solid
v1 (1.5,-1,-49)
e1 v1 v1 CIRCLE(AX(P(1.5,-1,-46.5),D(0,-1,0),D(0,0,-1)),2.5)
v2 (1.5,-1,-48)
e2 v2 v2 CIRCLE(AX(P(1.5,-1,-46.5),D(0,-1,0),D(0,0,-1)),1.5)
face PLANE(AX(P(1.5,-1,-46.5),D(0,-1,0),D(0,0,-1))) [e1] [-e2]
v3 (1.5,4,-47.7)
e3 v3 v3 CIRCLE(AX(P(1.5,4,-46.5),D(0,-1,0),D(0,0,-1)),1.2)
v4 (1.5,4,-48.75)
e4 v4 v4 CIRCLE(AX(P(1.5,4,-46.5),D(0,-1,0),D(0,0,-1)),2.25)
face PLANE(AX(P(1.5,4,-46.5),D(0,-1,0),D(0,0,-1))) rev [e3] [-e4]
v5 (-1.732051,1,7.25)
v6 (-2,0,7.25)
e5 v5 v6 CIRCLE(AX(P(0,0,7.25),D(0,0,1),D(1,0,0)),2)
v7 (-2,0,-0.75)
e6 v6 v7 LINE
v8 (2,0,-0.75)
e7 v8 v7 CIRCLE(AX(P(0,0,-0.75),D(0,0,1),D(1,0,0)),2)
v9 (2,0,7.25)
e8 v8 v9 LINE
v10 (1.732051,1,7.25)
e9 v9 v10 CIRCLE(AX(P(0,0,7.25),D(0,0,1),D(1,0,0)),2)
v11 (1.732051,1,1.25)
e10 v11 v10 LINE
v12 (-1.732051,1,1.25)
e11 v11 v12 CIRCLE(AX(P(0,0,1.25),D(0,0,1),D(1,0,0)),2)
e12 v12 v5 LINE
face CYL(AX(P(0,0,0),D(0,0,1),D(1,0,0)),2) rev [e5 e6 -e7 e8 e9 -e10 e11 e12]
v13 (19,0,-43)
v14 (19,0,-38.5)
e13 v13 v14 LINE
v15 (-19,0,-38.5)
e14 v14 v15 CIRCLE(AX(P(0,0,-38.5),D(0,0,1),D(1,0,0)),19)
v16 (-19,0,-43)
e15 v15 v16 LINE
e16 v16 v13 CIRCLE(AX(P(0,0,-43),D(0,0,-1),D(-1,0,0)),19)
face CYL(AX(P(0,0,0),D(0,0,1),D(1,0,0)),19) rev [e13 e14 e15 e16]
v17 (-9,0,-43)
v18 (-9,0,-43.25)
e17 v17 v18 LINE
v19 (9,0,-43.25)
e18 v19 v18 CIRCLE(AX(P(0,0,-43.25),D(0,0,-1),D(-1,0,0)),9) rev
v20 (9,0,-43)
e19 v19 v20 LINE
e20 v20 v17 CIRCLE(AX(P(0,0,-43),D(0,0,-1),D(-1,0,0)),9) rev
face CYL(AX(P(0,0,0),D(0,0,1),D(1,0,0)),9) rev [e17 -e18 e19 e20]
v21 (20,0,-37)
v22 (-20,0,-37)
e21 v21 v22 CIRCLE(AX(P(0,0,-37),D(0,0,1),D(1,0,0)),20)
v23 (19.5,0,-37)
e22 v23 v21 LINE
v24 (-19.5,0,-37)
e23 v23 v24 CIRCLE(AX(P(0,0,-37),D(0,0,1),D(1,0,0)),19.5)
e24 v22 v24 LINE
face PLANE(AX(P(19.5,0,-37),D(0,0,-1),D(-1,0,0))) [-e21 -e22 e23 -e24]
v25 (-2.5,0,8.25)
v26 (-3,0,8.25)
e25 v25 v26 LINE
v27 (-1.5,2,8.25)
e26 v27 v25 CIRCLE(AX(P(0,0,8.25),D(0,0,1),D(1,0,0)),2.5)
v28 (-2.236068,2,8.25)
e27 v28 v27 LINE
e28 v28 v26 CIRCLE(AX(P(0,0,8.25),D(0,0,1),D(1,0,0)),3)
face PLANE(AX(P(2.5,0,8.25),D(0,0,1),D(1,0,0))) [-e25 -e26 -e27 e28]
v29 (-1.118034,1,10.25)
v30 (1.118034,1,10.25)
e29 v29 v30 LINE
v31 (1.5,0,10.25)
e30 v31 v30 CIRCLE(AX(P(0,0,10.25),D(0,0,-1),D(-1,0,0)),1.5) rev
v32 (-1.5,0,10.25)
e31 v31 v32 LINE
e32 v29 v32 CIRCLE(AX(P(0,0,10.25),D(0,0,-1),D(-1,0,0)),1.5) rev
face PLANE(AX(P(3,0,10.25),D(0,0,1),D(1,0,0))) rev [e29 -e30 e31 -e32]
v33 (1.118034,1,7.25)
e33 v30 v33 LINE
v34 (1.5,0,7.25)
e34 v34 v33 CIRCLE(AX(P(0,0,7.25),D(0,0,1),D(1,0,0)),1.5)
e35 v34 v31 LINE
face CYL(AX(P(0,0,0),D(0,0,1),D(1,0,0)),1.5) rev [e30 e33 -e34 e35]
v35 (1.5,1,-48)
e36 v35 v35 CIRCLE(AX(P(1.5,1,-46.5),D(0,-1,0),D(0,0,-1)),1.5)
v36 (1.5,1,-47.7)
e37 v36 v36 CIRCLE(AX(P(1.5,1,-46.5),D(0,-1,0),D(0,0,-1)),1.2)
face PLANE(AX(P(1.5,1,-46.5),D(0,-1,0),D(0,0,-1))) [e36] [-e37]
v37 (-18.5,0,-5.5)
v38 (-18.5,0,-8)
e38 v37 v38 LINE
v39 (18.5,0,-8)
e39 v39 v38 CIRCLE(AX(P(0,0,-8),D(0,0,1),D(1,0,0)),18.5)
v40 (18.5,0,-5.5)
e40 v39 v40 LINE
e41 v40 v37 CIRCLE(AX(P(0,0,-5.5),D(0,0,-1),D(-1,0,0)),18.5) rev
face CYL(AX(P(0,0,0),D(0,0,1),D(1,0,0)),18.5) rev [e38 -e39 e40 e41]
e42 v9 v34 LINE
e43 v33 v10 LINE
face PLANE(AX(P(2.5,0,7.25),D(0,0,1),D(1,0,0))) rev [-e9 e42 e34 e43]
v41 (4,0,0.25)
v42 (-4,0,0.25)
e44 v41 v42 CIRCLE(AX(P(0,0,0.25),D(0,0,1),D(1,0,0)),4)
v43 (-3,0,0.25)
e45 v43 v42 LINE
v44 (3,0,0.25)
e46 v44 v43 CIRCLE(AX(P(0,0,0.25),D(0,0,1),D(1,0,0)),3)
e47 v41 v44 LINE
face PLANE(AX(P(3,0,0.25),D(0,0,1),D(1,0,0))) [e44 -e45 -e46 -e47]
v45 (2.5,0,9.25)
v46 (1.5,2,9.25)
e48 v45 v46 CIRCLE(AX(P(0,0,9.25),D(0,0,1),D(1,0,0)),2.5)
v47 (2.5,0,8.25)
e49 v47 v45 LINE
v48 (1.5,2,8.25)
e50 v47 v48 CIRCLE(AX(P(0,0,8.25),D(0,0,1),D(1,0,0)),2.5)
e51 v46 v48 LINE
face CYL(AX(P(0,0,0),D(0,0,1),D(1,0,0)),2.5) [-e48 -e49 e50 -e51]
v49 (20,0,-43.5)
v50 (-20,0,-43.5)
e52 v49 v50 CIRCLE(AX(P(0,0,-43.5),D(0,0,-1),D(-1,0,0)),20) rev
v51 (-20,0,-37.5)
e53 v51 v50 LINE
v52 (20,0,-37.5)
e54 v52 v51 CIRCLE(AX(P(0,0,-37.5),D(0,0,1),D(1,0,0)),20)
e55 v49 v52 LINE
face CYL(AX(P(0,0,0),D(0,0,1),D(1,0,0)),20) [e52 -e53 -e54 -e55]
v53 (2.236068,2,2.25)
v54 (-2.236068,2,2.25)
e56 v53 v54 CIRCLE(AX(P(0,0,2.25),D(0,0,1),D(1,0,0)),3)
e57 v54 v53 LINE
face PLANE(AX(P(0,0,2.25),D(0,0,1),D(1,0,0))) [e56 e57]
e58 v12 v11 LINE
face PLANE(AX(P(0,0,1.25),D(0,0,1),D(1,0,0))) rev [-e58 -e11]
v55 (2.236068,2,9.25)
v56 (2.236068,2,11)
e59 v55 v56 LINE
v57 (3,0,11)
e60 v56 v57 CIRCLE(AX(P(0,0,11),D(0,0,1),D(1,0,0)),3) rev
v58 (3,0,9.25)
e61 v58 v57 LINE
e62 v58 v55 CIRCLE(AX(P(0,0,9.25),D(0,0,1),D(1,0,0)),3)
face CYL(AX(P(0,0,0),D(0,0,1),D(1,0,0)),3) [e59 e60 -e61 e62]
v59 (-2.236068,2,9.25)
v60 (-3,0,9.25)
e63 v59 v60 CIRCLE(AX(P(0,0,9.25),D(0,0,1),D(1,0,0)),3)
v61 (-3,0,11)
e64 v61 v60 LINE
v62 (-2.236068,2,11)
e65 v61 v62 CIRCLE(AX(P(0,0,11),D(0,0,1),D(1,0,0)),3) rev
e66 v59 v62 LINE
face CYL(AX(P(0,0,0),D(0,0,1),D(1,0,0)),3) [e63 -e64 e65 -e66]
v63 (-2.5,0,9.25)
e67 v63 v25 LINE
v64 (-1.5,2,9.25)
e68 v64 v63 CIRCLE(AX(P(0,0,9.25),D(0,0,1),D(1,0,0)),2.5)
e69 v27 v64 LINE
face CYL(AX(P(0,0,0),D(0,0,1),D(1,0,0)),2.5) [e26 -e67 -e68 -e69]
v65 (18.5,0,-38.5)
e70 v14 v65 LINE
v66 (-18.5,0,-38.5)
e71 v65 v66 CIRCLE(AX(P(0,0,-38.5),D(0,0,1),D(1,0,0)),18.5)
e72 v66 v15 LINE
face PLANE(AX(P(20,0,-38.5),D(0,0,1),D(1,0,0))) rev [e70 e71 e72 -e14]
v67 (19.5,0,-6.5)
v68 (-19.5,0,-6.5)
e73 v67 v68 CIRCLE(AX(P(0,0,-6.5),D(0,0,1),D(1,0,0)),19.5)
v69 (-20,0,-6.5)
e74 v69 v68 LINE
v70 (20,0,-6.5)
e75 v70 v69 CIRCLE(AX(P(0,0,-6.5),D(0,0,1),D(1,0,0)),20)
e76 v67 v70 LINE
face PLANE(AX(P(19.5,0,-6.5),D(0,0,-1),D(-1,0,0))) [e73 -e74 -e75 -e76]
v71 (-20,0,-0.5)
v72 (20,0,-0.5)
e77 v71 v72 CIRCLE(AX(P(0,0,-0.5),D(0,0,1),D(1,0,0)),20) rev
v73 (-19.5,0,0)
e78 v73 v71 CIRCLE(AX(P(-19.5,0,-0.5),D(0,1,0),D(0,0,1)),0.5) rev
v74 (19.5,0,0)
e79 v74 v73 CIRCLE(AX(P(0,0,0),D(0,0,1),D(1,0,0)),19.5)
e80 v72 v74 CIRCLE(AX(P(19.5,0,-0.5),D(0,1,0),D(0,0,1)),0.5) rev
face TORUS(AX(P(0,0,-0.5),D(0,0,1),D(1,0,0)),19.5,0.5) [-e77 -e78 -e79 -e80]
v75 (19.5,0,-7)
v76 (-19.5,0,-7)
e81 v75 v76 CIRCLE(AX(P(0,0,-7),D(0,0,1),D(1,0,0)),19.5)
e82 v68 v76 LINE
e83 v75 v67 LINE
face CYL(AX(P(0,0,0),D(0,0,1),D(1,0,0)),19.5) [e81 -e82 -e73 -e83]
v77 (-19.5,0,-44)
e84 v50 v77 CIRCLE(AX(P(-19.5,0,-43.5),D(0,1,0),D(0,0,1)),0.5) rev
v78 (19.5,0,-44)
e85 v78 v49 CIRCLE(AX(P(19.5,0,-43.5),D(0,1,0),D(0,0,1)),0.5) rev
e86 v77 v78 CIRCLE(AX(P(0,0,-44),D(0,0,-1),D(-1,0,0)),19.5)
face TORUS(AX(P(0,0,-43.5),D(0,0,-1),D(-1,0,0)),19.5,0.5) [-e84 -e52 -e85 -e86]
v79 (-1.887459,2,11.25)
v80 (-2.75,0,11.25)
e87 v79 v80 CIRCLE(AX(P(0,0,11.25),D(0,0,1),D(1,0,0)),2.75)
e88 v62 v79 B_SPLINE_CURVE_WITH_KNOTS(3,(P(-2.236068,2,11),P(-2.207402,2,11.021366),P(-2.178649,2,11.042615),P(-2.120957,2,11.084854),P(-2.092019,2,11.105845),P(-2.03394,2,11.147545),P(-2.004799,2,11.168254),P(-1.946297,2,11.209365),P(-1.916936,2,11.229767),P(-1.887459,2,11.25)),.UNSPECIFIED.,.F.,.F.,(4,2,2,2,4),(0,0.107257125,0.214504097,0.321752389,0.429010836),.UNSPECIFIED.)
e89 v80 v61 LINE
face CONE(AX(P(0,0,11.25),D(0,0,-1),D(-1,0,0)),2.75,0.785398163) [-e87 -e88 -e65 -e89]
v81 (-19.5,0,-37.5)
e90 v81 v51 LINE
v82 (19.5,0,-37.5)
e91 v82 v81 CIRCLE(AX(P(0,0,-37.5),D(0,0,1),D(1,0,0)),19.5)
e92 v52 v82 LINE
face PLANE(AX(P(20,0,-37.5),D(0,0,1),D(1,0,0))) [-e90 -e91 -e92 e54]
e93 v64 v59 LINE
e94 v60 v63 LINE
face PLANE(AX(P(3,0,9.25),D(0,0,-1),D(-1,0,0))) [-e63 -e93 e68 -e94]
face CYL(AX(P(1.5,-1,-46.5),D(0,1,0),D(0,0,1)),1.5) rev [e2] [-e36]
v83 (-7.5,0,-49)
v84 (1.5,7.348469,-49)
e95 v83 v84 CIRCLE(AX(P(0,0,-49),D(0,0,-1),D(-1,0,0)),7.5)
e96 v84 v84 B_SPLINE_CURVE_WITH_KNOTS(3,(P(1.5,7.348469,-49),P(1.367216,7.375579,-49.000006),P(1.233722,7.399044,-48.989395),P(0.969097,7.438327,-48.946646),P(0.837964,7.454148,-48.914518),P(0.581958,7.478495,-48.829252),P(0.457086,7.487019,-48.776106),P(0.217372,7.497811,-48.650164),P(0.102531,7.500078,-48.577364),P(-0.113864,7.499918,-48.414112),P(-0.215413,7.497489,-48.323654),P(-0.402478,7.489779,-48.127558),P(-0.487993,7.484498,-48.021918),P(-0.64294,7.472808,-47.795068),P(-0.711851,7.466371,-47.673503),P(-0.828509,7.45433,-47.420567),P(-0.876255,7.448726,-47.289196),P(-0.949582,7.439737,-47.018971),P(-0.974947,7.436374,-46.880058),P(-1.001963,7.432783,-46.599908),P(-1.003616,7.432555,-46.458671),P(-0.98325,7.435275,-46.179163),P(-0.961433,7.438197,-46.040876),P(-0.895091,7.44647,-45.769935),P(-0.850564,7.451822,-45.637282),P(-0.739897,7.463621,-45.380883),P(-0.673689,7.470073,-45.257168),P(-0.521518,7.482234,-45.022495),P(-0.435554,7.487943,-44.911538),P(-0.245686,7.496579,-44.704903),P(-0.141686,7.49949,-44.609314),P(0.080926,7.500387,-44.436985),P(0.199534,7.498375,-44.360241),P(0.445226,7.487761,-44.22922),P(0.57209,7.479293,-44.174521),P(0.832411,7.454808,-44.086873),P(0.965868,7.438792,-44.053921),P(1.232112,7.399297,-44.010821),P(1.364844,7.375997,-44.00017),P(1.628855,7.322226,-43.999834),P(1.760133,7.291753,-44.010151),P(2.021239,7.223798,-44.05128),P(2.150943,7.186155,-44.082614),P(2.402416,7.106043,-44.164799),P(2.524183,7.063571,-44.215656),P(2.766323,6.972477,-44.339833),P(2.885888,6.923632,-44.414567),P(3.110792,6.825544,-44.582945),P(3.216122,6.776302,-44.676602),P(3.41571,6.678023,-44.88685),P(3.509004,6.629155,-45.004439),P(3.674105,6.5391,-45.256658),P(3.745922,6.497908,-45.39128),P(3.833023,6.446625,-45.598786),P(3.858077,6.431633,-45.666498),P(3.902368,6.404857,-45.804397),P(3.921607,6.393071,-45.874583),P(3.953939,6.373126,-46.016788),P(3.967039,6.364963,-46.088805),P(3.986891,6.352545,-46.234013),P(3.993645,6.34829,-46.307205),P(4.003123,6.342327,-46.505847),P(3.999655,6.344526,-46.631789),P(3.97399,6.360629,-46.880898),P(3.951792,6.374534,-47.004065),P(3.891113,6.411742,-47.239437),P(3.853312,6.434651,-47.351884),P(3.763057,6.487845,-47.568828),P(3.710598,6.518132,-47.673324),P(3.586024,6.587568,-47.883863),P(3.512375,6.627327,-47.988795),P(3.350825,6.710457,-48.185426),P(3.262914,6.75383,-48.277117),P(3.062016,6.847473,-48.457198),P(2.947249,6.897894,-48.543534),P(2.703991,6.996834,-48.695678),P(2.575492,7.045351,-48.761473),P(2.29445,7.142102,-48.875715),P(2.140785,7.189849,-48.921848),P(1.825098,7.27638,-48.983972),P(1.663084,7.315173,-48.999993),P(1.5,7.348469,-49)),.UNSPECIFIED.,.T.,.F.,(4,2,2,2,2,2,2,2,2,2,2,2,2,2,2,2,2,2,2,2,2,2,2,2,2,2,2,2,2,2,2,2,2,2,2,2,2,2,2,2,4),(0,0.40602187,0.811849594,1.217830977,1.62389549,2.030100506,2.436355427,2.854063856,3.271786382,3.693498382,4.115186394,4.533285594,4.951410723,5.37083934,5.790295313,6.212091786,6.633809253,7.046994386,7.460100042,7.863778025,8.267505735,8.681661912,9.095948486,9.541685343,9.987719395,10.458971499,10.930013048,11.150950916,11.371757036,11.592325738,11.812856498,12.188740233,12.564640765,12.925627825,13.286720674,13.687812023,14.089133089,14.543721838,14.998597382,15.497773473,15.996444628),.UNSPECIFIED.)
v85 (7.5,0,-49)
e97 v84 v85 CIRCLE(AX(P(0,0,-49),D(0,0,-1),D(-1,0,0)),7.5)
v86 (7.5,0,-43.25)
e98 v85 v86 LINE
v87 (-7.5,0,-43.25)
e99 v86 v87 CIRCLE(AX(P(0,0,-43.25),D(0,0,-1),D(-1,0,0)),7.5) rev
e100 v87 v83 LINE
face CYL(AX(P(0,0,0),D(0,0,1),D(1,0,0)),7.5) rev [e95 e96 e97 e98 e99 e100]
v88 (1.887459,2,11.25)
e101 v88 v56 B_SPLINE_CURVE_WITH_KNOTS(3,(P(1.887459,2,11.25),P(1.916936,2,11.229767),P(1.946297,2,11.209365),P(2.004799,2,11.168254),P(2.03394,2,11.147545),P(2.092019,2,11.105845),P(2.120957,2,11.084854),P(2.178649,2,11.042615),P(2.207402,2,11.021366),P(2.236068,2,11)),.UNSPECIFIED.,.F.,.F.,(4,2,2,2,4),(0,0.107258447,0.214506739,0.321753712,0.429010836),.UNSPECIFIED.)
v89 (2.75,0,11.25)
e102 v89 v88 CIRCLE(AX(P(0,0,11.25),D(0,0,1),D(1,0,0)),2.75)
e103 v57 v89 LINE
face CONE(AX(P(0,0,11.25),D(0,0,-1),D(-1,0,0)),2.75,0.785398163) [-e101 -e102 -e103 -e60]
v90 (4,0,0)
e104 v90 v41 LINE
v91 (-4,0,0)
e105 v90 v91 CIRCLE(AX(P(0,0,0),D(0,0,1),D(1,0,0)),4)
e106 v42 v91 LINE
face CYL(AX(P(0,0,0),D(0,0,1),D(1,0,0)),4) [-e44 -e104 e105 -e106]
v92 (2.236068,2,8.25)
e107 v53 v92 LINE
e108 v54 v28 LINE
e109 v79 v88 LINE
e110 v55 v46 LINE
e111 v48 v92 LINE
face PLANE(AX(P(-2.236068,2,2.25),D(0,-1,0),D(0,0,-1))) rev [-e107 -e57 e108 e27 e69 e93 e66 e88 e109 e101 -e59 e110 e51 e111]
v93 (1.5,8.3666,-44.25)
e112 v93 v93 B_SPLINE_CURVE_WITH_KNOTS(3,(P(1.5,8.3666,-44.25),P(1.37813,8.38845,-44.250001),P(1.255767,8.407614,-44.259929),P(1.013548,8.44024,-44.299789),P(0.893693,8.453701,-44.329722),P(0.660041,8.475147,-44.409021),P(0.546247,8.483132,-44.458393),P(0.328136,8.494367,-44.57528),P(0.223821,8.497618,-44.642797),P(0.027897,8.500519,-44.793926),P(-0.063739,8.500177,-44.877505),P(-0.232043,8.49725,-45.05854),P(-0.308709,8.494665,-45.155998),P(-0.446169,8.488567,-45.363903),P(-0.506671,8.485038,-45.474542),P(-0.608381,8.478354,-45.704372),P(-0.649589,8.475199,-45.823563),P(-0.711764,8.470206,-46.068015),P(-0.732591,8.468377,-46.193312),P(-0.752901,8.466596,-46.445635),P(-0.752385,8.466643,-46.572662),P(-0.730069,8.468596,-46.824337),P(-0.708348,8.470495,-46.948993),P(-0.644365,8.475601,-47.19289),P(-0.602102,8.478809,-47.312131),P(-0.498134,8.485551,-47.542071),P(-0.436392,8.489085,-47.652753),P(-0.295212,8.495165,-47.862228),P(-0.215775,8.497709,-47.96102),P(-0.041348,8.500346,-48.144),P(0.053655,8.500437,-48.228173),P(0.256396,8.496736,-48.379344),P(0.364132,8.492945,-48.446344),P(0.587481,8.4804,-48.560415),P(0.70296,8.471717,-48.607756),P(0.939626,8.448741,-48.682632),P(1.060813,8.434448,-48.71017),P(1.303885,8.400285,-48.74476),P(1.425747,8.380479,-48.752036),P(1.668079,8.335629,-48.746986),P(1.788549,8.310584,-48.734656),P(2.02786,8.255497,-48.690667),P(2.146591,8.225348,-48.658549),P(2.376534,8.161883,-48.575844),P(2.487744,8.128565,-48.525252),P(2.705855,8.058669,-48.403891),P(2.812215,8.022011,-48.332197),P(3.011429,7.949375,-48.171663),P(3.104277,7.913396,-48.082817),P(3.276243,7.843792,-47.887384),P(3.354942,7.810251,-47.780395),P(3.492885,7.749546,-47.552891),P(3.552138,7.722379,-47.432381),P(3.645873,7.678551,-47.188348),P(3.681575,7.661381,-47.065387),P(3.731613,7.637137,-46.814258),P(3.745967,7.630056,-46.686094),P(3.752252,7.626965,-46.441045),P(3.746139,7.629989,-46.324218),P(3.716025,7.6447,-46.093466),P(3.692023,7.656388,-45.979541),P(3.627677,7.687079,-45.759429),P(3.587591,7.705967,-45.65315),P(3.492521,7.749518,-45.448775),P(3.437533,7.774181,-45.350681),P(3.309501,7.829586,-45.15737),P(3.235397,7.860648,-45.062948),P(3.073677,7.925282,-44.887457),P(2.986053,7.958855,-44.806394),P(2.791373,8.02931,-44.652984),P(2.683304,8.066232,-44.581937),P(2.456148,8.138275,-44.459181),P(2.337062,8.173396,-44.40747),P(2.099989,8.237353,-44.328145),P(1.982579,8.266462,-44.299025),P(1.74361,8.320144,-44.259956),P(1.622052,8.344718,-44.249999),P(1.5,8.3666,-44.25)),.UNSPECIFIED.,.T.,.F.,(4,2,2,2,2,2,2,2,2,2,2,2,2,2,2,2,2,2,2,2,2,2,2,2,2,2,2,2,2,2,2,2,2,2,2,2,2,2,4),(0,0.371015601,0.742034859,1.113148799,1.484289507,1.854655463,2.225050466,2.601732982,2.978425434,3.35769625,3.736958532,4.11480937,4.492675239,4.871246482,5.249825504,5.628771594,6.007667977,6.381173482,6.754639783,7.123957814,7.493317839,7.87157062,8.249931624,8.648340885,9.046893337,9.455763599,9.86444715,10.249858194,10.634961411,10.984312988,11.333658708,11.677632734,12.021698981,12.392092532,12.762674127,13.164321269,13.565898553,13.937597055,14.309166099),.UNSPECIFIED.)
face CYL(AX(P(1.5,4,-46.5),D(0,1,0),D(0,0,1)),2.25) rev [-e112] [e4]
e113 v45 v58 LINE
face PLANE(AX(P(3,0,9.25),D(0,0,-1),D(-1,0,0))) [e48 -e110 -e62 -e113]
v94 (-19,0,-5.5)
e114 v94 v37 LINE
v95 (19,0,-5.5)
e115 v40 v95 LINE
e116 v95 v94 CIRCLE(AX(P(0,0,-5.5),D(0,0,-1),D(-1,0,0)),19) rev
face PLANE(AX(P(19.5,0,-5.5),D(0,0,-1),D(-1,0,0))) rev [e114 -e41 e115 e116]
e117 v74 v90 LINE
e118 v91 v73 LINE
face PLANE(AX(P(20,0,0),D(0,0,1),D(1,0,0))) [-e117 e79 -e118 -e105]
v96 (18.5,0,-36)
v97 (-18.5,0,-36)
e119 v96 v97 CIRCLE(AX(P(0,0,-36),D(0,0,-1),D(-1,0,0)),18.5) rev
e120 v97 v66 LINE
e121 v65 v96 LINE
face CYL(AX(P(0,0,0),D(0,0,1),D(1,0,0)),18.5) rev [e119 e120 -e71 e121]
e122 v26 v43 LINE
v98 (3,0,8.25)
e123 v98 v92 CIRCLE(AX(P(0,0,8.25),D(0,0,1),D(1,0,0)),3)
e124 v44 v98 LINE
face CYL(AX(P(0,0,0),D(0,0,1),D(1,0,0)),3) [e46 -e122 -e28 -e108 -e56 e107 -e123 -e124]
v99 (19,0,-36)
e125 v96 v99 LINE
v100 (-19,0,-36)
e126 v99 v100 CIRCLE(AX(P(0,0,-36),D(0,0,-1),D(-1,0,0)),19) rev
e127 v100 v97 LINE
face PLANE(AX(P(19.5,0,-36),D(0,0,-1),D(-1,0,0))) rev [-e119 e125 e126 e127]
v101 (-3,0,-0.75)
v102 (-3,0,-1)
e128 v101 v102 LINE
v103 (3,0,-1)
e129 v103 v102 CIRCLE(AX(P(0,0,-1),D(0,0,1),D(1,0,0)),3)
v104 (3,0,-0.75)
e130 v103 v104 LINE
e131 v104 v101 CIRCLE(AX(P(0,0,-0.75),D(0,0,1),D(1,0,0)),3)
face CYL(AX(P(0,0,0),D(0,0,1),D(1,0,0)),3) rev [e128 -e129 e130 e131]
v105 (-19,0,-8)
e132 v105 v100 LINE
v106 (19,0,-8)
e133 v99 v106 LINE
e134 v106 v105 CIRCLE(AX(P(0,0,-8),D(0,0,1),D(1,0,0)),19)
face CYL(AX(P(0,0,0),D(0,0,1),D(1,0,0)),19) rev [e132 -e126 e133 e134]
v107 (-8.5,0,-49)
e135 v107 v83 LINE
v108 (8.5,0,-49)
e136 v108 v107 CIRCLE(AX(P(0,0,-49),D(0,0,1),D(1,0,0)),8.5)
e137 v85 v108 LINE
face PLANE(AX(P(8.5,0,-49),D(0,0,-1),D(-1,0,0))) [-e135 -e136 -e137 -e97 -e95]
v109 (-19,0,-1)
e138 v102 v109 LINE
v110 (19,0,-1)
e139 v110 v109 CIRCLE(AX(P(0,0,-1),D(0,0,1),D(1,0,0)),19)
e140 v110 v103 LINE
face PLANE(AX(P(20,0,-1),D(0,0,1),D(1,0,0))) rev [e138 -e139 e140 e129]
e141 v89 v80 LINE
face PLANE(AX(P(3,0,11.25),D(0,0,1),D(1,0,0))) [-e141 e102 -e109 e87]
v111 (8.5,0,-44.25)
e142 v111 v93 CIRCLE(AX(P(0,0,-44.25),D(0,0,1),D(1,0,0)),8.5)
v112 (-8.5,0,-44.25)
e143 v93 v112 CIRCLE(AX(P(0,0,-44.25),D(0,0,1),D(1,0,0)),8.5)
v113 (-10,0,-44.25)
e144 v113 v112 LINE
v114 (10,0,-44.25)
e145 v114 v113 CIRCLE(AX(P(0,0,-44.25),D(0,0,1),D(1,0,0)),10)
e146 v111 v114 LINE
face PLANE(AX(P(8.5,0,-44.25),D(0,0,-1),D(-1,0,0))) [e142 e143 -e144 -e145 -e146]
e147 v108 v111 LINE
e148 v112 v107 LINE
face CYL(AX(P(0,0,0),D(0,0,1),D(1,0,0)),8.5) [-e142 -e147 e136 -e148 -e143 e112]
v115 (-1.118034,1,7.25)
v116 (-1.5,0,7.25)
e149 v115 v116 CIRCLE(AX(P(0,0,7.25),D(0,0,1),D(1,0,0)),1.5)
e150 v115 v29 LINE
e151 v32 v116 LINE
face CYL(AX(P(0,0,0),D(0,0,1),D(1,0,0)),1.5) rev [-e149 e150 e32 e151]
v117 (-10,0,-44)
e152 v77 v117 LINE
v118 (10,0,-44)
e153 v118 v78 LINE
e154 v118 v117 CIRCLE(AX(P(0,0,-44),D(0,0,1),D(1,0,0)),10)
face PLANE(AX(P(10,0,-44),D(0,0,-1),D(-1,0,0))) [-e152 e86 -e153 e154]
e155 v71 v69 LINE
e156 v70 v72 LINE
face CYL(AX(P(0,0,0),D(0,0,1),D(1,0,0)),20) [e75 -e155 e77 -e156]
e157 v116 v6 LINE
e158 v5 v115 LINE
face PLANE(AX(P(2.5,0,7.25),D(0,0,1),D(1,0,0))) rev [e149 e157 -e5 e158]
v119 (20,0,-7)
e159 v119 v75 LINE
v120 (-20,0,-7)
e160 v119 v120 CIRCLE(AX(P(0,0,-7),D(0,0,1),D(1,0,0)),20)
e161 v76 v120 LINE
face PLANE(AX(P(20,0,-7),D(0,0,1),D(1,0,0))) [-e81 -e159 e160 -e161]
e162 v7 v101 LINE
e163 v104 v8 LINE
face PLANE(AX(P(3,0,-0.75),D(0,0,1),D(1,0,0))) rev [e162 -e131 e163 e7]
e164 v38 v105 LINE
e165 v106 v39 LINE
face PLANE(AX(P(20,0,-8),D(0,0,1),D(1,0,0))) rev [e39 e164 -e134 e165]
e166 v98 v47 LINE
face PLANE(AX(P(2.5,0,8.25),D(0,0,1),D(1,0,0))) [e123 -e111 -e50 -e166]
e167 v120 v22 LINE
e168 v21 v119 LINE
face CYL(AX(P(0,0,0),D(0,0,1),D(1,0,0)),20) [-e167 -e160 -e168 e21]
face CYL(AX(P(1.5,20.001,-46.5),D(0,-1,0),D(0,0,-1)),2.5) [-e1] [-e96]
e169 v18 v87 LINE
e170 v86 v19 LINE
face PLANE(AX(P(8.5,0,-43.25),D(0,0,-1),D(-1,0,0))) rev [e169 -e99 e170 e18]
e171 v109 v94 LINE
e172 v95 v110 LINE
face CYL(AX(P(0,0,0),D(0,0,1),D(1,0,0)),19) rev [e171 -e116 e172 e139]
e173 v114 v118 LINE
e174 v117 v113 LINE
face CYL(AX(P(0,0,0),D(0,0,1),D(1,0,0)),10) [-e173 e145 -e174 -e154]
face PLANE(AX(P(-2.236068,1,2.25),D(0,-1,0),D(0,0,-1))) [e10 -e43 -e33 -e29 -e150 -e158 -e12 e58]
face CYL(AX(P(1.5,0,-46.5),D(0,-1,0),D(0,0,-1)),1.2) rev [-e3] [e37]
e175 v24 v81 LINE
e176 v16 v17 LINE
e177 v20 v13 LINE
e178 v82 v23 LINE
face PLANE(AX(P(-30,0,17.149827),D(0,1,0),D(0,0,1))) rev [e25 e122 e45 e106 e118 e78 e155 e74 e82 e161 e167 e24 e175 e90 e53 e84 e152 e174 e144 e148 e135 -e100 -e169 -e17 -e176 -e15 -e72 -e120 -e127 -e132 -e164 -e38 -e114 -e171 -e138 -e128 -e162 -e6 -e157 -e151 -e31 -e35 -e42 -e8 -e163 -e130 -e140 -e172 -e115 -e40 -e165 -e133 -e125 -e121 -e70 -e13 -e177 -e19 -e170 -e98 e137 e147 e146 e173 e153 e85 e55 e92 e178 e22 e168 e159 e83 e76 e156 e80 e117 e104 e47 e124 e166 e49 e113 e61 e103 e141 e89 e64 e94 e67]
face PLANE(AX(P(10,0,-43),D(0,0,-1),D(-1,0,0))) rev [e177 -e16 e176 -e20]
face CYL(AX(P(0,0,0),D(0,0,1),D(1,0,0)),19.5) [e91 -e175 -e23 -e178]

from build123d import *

# Parameters (mm, degrees)
ENL_V_MAT_EXTRU_2_DEPTH = 9
CHANFREIN1_SIZE         = 0.25
CONG_1_R                = 0.5
ESQUISSE4_R             = 10
ENL_V_MAT_EXTRU_3_DEPTH = 23
CONG_2_R                = 1
ESQUISSE5_W             = 75.40554743
ESQUISSE5_H             = 27.453522384
ENL_V_MAT_EXTRU_4_DEPTH = 30
COQUE1_START            = -43
COQUE1_DEPTH            = 42
COQUE1_START_2          = -36
COQUE1_2_DEPTH          = 28
COQUE1_START_3          = -48
COQUE1_3_DEPTH          = 5
COQUE1_4_DEPTH          = 4.5
COQUE1_START_4          = -5.5
COQUE1_5_DEPTH          = 4.5
COQUE1_START_5          = -1
COQUE1_6_DEPTH          = 8.25
COQUE1_START_6          = -43.25
COQUE1_7_DEPTH          = 0.25
COQUE1_START_7          = 7.25
COQUE1_8_DEPTH          = 3
COQUE1_9_DEPTH          = 2.25
COQUE1_10_DEPTH         = 0.25
ENL_V_START             = -10
ENL_V_MAT_EXTRU_5_DEPTH = 10
BOSS_EXTRU_1_REACH      = 58.577
BOSS_EXTRU_1_END_RADIUS = 7.5
ESQUISSE7_R             = 2.5
ESQUISSE9_R             = 2.25
ENL_V_MAT_EXTRU_6_DEPTH = 7
D_GAGEMENT_M22_D        = 2.4
BOSS_EXTRU_2_START      = 1
ESQUISSE11_R            = 2.5
ESQUISSE11_R_2          = 1.5
BOSS_EXTRU_2_DEPTH      = 1
ESQUISSE12_R            = 1.5
ESQUISSE12_R_2          = 1.2
ENL_V_MAT_EXTRU_7_DEPTH = 1


# Read off the part's stored shape, not the designer's step: Coque1
with BuildPart() as part:
    # Esquisse1 → Révolution1 (revolve)
    with BuildSketch(Plane(origin=(0, 0, 0), x_dir=(1, 0, 0), z_dir=(0, 1, 0))):
        Polygon((20, 0), (4, 0), (4, -0.25), (3, -0.25), (3, -8.25), (2.5, -8.25), (2.5, -9.25), (3, -9.25), (3, -11.25), (0, -11.25), (0, 49), (8.5, 49), (8.5, 44.25), (10, 44.25), (10, 44), (20, 44), (20, 37.5), (19.5, 37.5), (19.5, 37), (20, 37), (20, 7), (19.5, 7), (19.5, 6.5), (20, 6.5), align=None)
    revolve(axis=Axis((0, 0, 0), (0, 0, -1)))

    # Esquisse3 → Enlèv. mat.-Extru.2 (cut)
    with BuildSketch(Plane.XY.offset(11.25)):
        with BuildLine():
            Line((-2.236067977, 2), (2.236067977, 2))
            ThreePointArc((2.236067977, 2), (0, 3), (-2.236067977, 2))
        make_face()
    extrude(amount=-ENL_V_MAT_EXTRU_2_DEPTH, mode=Mode.SUBTRACT)

    # Chanfrein1
    chanfrein1_edges = [part.edges().sort_by_distance(p)[0] for p in [
        (0, -3, 11.25),
    ]]
    chamfer(chanfrein1_edges, length=CHANFREIN1_SIZE)

    # Congé1
    cong_1_edges = [part.edges().sort_by_distance(p)[0] for p in [
        (-20, 0, 0),
        (-20, 0, -44),
    ]]
    fillet(cong_1_edges, radius=CONG_1_R)

    # Esquisse4 → Enlèv. mat.-Extru.3 (cut)
    with BuildSketch(Plane(origin=(0, -29, 0), x_dir=(-1, 0, 0), z_dir=(0, 1, 0))):
        with Locations(Location((0, -22, 0), (0, 0, 270))):
            Circle(ESQUISSE4_R)
    extrude(amount=ENL_V_MAT_EXTRU_3_DEPTH, mode=Mode.SUBTRACT)

    # Congé2
    cong_2_edges = [part.edges().sort_by_distance(p)[0] for p in [
        (-0.062948247, -19.999900935, -12.000198118),
    ]]
    fillet(cong_2_edges, radius=CONG_2_R - 0.0001)  # a hair under: the kernel refuses the full size

    # Esquisse5 → Enlèv. mat.-Extru.4 (cut, symmetric)
    with BuildSketch(Plane(origin=(0, 0, 0), x_dir=(0, 0, -1), z_dir=(1, 0, 0))):
        with Locations((20.552947191, -13.726761192)):
            Rectangle(ESQUISSE5_W, ESQUISSE5_H)
    extrude(amount=ENL_V_MAT_EXTRU_4_DEPTH, both=True, mode=Mode.SUBTRACT)

    # Coque1 outline → Coque1 (cut)
    with BuildSketch(Plane.XY.offset(COQUE1_START)):
        with BuildLine():
            ThreePointArc((18.5, 0), (0, 18.5), (-18.5, 0))
            Line((-18.5, 0), (18.5, 0))
        make_face()
    extrude(amount=COQUE1_DEPTH, mode=Mode.SUBTRACT)

    # Coque1 2 outline → Coque1 2 (cut)
    with BuildSketch(Plane.XY.offset(COQUE1_START_2)):
        with BuildLine():
            Line((-19, 0), (-18.5, 0))
            ThreePointArc((-18.5, 0), (0, 18.5), (18.5, 0))
            Line((18.5, 0), (19, 0))
            ThreePointArc((19, 0), (0, 19), (-19, 0))
        make_face()
    extrude(amount=COQUE1_2_DEPTH, mode=Mode.SUBTRACT)

    # Coque1 3 outline → Coque1 3 (cut)
    with BuildSketch(Plane.XY.offset(COQUE1_START_3)):
        with BuildLine():
            ThreePointArc((7.5, 0), (0, 7.5), (-7.5, 0))
            Line((-7.5, 0), (7.5, 0))
        make_face()
    extrude(amount=COQUE1_3_DEPTH, mode=Mode.SUBTRACT)

    # Coque1 4 outline → Coque1 4 (cut)
    with BuildSketch(Plane.XY.offset(COQUE1_START)):
        with BuildLine():
            Line((-19, 0), (-18.5, 0))
            ThreePointArc((-18.5, 0), (0, 18.5), (18.5, 0))
            Line((18.5, 0), (19, 0))
            ThreePointArc((19, 0), (0, 19), (-19, 0))
        make_face()
    extrude(amount=COQUE1_4_DEPTH, mode=Mode.SUBTRACT)

    # Coque1 5 outline → Coque1 5 (cut)
    with BuildSketch(Plane.XY.offset(COQUE1_START_4)):
        with BuildLine():
            Line((-19, 0), (-18.5, 0))
            ThreePointArc((-18.5, 0), (0, 18.5), (18.5, 0))
            Line((18.5, 0), (19, 0))
            ThreePointArc((19, 0), (0, 19), (-19, 0))
        make_face()
    extrude(amount=COQUE1_5_DEPTH, mode=Mode.SUBTRACT)

    # Coque1 6 outline → Coque1 6 (cut)
    with BuildSketch(Plane.XY.offset(COQUE1_START_5)):
        with BuildLine():
            ThreePointArc((-1.732050808, 1), (-1.931851653, 0.51763809), (-2, 0))
            Line((-2, 0), (2, 0))
            ThreePointArc((2, 0), (1.931851653, 0.51763809), (1.732050808, 1))
            Line((1.732050808, 1), (-1.732050808, 1))
        make_face()
    extrude(amount=COQUE1_6_DEPTH, mode=Mode.SUBTRACT)

    # Coque1 7 outline → Coque1 7 (cut)
    with BuildSketch(Plane.XY.offset(COQUE1_START_6)):
        with BuildLine():
            Line((-9, 0), (-7.5, 0))
            ThreePointArc((-7.5, 0), (0, 7.5), (7.5, 0))
            Line((7.5, 0), (9, 0))
            ThreePointArc((9, 0), (0, 9), (-9, 0))
        make_face()
    extrude(amount=COQUE1_7_DEPTH, mode=Mode.SUBTRACT)

    # Coque1 8 outline → Coque1 8 (cut)
    with BuildSketch(Plane.XY.offset(COQUE1_START_7)):
        with BuildLine():
            Line((1.118033989, 1), (-1.118033989, 1))
            ThreePointArc((-1.118033989, 1), (-1.401258538, 0.535233134), (-1.5, 0))
            Line((-1.5, 0), (1.5, 0))
            ThreePointArc((1.5, 0), (1.401258538, 0.535233134), (1.118033989, 1))
        make_face()
    extrude(amount=COQUE1_8_DEPTH, mode=Mode.SUBTRACT)

    # Coque1 9 outline → Coque1 9 (cut)
    with BuildSketch(Plane.XY.offset(COQUE1_START_5)):
        with BuildLine():
            Line((-1.732050808, 1), (1.732050808, 1))
            ThreePointArc((1.732050808, 1), (0, 2), (-1.732050808, 1))
        make_face()
    extrude(amount=COQUE1_9_DEPTH, mode=Mode.SUBTRACT)

    # Coque1 10 outline → Coque1 10 (cut)
    with BuildSketch(Plane.XY.offset(COQUE1_START_5)):
        with BuildLine():
            ThreePointArc((-2, 0), (0, 2), (2, 0))
            Line((2, 0), (3, 0))
            ThreePointArc((3, 0), (0, 3), (-3, 0))
            Line((-3, 0), (-2, 0))
        make_face()
    extrude(amount=COQUE1_10_DEPTH, mode=Mode.SUBTRACT)

    # Esquisse6 → Enlèv. mat.-Extru.5 (cut)
    with BuildSketch(Plane.XY.offset(-48).offset(ENL_V_START)):
        with BuildLine():
            Line((-7.5, 0), (7.5, 0))
            ThreePointArc((7.5, 0), (0, 7.5), (-7.5, 0))
        make_face()
    extrude(amount=ENL_V_MAT_EXTRU_5_DEPTH, mode=Mode.SUBTRACT)

    # Boss.-Extru.1: up to this cylinder (the profile starts inside it)
    boss_extru_1_end = Plane(origin=(0, 0, -46.5), z_dir=(0, 0, 1)) * Cylinder(BOSS_EXTRU_1_END_RADIUS, 133.154, mode=Mode.PRIVATE)
    # Esquisse7 → Boss.-Extru.1 (add, up to the surface)
    with BuildSketch(Plane(origin=(0, 0, 0), x_dir=(1, 0, 0), z_dir=(0, 1, 0)), mode=Mode.PRIVATE) as boss_extru_1_sk1:
        with Locations(Location((1.5, 46.5, 0), (0, 0, 90))):
            Circle(ESQUISSE7_R)
    boss_extru_1_tool1 = extrude(boss_extru_1_sk1.sketch, amount=BOSS_EXTRU_1_REACH, mode=Mode.PRIVATE) & boss_extru_1_end
    add(boss_extru_1_tool1.solids().sort_by_distance((1.5, 0, -46.5))[0])

    # Esquisse9 → Enlèv. mat.-Extru.6 (cut)
    with BuildSketch(Plane.XZ.offset(-11)):
        with Locations(Location((1.5, -46.5, 0), (0, 0, 90))):
            Circle(ESQUISSE9_R)
    extrude(amount=ENL_V_MAT_EXTRU_6_DEPTH, mode=Mode.SUBTRACT)

    # Dégagement M22 (through all)
    with Locations(Plane(origin=(1.5, 0, -46.5), x_dir=(0, 0, -1), z_dir=(0, -1, 0))):
        with Locations((0, 0)):
            Hole(D_GAGEMENT_M22_D / 2)

    # Esquisse11 → Boss.-Extru.2 (add)
    with BuildSketch(Plane.XZ.offset(BOSS_EXTRU_2_START)):
        with Locations(Location((1.5, -46.5, 0), (0, 0, 270))):
            Circle(ESQUISSE11_R)
        with Locations(Location((1.5, -46.5, 0), (0, 0, 270))):
            Circle(ESQUISSE11_R_2, mode=Mode.SUBTRACT)
    extrude(amount=-BOSS_EXTRU_2_DEPTH)

    # Esquisse12 → Enlèv. mat.-Extru.7 (cut)
    with BuildSketch(Plane.XZ):
        with Locations(Location((1.5, -46.5, 0), (0, 0, 270))):
            Circle(ESQUISSE12_R)
        with Locations(Location((1.5, -46.5, 0), (0, 0, 270))):
            Circle(ESQUISSE12_R_2, mode=Mode.SUBTRACT)
    extrude(amount=-ENL_V_MAT_EXTRU_7_DEPTH, mode=Mode.SUBTRACT)


solid = part.part
